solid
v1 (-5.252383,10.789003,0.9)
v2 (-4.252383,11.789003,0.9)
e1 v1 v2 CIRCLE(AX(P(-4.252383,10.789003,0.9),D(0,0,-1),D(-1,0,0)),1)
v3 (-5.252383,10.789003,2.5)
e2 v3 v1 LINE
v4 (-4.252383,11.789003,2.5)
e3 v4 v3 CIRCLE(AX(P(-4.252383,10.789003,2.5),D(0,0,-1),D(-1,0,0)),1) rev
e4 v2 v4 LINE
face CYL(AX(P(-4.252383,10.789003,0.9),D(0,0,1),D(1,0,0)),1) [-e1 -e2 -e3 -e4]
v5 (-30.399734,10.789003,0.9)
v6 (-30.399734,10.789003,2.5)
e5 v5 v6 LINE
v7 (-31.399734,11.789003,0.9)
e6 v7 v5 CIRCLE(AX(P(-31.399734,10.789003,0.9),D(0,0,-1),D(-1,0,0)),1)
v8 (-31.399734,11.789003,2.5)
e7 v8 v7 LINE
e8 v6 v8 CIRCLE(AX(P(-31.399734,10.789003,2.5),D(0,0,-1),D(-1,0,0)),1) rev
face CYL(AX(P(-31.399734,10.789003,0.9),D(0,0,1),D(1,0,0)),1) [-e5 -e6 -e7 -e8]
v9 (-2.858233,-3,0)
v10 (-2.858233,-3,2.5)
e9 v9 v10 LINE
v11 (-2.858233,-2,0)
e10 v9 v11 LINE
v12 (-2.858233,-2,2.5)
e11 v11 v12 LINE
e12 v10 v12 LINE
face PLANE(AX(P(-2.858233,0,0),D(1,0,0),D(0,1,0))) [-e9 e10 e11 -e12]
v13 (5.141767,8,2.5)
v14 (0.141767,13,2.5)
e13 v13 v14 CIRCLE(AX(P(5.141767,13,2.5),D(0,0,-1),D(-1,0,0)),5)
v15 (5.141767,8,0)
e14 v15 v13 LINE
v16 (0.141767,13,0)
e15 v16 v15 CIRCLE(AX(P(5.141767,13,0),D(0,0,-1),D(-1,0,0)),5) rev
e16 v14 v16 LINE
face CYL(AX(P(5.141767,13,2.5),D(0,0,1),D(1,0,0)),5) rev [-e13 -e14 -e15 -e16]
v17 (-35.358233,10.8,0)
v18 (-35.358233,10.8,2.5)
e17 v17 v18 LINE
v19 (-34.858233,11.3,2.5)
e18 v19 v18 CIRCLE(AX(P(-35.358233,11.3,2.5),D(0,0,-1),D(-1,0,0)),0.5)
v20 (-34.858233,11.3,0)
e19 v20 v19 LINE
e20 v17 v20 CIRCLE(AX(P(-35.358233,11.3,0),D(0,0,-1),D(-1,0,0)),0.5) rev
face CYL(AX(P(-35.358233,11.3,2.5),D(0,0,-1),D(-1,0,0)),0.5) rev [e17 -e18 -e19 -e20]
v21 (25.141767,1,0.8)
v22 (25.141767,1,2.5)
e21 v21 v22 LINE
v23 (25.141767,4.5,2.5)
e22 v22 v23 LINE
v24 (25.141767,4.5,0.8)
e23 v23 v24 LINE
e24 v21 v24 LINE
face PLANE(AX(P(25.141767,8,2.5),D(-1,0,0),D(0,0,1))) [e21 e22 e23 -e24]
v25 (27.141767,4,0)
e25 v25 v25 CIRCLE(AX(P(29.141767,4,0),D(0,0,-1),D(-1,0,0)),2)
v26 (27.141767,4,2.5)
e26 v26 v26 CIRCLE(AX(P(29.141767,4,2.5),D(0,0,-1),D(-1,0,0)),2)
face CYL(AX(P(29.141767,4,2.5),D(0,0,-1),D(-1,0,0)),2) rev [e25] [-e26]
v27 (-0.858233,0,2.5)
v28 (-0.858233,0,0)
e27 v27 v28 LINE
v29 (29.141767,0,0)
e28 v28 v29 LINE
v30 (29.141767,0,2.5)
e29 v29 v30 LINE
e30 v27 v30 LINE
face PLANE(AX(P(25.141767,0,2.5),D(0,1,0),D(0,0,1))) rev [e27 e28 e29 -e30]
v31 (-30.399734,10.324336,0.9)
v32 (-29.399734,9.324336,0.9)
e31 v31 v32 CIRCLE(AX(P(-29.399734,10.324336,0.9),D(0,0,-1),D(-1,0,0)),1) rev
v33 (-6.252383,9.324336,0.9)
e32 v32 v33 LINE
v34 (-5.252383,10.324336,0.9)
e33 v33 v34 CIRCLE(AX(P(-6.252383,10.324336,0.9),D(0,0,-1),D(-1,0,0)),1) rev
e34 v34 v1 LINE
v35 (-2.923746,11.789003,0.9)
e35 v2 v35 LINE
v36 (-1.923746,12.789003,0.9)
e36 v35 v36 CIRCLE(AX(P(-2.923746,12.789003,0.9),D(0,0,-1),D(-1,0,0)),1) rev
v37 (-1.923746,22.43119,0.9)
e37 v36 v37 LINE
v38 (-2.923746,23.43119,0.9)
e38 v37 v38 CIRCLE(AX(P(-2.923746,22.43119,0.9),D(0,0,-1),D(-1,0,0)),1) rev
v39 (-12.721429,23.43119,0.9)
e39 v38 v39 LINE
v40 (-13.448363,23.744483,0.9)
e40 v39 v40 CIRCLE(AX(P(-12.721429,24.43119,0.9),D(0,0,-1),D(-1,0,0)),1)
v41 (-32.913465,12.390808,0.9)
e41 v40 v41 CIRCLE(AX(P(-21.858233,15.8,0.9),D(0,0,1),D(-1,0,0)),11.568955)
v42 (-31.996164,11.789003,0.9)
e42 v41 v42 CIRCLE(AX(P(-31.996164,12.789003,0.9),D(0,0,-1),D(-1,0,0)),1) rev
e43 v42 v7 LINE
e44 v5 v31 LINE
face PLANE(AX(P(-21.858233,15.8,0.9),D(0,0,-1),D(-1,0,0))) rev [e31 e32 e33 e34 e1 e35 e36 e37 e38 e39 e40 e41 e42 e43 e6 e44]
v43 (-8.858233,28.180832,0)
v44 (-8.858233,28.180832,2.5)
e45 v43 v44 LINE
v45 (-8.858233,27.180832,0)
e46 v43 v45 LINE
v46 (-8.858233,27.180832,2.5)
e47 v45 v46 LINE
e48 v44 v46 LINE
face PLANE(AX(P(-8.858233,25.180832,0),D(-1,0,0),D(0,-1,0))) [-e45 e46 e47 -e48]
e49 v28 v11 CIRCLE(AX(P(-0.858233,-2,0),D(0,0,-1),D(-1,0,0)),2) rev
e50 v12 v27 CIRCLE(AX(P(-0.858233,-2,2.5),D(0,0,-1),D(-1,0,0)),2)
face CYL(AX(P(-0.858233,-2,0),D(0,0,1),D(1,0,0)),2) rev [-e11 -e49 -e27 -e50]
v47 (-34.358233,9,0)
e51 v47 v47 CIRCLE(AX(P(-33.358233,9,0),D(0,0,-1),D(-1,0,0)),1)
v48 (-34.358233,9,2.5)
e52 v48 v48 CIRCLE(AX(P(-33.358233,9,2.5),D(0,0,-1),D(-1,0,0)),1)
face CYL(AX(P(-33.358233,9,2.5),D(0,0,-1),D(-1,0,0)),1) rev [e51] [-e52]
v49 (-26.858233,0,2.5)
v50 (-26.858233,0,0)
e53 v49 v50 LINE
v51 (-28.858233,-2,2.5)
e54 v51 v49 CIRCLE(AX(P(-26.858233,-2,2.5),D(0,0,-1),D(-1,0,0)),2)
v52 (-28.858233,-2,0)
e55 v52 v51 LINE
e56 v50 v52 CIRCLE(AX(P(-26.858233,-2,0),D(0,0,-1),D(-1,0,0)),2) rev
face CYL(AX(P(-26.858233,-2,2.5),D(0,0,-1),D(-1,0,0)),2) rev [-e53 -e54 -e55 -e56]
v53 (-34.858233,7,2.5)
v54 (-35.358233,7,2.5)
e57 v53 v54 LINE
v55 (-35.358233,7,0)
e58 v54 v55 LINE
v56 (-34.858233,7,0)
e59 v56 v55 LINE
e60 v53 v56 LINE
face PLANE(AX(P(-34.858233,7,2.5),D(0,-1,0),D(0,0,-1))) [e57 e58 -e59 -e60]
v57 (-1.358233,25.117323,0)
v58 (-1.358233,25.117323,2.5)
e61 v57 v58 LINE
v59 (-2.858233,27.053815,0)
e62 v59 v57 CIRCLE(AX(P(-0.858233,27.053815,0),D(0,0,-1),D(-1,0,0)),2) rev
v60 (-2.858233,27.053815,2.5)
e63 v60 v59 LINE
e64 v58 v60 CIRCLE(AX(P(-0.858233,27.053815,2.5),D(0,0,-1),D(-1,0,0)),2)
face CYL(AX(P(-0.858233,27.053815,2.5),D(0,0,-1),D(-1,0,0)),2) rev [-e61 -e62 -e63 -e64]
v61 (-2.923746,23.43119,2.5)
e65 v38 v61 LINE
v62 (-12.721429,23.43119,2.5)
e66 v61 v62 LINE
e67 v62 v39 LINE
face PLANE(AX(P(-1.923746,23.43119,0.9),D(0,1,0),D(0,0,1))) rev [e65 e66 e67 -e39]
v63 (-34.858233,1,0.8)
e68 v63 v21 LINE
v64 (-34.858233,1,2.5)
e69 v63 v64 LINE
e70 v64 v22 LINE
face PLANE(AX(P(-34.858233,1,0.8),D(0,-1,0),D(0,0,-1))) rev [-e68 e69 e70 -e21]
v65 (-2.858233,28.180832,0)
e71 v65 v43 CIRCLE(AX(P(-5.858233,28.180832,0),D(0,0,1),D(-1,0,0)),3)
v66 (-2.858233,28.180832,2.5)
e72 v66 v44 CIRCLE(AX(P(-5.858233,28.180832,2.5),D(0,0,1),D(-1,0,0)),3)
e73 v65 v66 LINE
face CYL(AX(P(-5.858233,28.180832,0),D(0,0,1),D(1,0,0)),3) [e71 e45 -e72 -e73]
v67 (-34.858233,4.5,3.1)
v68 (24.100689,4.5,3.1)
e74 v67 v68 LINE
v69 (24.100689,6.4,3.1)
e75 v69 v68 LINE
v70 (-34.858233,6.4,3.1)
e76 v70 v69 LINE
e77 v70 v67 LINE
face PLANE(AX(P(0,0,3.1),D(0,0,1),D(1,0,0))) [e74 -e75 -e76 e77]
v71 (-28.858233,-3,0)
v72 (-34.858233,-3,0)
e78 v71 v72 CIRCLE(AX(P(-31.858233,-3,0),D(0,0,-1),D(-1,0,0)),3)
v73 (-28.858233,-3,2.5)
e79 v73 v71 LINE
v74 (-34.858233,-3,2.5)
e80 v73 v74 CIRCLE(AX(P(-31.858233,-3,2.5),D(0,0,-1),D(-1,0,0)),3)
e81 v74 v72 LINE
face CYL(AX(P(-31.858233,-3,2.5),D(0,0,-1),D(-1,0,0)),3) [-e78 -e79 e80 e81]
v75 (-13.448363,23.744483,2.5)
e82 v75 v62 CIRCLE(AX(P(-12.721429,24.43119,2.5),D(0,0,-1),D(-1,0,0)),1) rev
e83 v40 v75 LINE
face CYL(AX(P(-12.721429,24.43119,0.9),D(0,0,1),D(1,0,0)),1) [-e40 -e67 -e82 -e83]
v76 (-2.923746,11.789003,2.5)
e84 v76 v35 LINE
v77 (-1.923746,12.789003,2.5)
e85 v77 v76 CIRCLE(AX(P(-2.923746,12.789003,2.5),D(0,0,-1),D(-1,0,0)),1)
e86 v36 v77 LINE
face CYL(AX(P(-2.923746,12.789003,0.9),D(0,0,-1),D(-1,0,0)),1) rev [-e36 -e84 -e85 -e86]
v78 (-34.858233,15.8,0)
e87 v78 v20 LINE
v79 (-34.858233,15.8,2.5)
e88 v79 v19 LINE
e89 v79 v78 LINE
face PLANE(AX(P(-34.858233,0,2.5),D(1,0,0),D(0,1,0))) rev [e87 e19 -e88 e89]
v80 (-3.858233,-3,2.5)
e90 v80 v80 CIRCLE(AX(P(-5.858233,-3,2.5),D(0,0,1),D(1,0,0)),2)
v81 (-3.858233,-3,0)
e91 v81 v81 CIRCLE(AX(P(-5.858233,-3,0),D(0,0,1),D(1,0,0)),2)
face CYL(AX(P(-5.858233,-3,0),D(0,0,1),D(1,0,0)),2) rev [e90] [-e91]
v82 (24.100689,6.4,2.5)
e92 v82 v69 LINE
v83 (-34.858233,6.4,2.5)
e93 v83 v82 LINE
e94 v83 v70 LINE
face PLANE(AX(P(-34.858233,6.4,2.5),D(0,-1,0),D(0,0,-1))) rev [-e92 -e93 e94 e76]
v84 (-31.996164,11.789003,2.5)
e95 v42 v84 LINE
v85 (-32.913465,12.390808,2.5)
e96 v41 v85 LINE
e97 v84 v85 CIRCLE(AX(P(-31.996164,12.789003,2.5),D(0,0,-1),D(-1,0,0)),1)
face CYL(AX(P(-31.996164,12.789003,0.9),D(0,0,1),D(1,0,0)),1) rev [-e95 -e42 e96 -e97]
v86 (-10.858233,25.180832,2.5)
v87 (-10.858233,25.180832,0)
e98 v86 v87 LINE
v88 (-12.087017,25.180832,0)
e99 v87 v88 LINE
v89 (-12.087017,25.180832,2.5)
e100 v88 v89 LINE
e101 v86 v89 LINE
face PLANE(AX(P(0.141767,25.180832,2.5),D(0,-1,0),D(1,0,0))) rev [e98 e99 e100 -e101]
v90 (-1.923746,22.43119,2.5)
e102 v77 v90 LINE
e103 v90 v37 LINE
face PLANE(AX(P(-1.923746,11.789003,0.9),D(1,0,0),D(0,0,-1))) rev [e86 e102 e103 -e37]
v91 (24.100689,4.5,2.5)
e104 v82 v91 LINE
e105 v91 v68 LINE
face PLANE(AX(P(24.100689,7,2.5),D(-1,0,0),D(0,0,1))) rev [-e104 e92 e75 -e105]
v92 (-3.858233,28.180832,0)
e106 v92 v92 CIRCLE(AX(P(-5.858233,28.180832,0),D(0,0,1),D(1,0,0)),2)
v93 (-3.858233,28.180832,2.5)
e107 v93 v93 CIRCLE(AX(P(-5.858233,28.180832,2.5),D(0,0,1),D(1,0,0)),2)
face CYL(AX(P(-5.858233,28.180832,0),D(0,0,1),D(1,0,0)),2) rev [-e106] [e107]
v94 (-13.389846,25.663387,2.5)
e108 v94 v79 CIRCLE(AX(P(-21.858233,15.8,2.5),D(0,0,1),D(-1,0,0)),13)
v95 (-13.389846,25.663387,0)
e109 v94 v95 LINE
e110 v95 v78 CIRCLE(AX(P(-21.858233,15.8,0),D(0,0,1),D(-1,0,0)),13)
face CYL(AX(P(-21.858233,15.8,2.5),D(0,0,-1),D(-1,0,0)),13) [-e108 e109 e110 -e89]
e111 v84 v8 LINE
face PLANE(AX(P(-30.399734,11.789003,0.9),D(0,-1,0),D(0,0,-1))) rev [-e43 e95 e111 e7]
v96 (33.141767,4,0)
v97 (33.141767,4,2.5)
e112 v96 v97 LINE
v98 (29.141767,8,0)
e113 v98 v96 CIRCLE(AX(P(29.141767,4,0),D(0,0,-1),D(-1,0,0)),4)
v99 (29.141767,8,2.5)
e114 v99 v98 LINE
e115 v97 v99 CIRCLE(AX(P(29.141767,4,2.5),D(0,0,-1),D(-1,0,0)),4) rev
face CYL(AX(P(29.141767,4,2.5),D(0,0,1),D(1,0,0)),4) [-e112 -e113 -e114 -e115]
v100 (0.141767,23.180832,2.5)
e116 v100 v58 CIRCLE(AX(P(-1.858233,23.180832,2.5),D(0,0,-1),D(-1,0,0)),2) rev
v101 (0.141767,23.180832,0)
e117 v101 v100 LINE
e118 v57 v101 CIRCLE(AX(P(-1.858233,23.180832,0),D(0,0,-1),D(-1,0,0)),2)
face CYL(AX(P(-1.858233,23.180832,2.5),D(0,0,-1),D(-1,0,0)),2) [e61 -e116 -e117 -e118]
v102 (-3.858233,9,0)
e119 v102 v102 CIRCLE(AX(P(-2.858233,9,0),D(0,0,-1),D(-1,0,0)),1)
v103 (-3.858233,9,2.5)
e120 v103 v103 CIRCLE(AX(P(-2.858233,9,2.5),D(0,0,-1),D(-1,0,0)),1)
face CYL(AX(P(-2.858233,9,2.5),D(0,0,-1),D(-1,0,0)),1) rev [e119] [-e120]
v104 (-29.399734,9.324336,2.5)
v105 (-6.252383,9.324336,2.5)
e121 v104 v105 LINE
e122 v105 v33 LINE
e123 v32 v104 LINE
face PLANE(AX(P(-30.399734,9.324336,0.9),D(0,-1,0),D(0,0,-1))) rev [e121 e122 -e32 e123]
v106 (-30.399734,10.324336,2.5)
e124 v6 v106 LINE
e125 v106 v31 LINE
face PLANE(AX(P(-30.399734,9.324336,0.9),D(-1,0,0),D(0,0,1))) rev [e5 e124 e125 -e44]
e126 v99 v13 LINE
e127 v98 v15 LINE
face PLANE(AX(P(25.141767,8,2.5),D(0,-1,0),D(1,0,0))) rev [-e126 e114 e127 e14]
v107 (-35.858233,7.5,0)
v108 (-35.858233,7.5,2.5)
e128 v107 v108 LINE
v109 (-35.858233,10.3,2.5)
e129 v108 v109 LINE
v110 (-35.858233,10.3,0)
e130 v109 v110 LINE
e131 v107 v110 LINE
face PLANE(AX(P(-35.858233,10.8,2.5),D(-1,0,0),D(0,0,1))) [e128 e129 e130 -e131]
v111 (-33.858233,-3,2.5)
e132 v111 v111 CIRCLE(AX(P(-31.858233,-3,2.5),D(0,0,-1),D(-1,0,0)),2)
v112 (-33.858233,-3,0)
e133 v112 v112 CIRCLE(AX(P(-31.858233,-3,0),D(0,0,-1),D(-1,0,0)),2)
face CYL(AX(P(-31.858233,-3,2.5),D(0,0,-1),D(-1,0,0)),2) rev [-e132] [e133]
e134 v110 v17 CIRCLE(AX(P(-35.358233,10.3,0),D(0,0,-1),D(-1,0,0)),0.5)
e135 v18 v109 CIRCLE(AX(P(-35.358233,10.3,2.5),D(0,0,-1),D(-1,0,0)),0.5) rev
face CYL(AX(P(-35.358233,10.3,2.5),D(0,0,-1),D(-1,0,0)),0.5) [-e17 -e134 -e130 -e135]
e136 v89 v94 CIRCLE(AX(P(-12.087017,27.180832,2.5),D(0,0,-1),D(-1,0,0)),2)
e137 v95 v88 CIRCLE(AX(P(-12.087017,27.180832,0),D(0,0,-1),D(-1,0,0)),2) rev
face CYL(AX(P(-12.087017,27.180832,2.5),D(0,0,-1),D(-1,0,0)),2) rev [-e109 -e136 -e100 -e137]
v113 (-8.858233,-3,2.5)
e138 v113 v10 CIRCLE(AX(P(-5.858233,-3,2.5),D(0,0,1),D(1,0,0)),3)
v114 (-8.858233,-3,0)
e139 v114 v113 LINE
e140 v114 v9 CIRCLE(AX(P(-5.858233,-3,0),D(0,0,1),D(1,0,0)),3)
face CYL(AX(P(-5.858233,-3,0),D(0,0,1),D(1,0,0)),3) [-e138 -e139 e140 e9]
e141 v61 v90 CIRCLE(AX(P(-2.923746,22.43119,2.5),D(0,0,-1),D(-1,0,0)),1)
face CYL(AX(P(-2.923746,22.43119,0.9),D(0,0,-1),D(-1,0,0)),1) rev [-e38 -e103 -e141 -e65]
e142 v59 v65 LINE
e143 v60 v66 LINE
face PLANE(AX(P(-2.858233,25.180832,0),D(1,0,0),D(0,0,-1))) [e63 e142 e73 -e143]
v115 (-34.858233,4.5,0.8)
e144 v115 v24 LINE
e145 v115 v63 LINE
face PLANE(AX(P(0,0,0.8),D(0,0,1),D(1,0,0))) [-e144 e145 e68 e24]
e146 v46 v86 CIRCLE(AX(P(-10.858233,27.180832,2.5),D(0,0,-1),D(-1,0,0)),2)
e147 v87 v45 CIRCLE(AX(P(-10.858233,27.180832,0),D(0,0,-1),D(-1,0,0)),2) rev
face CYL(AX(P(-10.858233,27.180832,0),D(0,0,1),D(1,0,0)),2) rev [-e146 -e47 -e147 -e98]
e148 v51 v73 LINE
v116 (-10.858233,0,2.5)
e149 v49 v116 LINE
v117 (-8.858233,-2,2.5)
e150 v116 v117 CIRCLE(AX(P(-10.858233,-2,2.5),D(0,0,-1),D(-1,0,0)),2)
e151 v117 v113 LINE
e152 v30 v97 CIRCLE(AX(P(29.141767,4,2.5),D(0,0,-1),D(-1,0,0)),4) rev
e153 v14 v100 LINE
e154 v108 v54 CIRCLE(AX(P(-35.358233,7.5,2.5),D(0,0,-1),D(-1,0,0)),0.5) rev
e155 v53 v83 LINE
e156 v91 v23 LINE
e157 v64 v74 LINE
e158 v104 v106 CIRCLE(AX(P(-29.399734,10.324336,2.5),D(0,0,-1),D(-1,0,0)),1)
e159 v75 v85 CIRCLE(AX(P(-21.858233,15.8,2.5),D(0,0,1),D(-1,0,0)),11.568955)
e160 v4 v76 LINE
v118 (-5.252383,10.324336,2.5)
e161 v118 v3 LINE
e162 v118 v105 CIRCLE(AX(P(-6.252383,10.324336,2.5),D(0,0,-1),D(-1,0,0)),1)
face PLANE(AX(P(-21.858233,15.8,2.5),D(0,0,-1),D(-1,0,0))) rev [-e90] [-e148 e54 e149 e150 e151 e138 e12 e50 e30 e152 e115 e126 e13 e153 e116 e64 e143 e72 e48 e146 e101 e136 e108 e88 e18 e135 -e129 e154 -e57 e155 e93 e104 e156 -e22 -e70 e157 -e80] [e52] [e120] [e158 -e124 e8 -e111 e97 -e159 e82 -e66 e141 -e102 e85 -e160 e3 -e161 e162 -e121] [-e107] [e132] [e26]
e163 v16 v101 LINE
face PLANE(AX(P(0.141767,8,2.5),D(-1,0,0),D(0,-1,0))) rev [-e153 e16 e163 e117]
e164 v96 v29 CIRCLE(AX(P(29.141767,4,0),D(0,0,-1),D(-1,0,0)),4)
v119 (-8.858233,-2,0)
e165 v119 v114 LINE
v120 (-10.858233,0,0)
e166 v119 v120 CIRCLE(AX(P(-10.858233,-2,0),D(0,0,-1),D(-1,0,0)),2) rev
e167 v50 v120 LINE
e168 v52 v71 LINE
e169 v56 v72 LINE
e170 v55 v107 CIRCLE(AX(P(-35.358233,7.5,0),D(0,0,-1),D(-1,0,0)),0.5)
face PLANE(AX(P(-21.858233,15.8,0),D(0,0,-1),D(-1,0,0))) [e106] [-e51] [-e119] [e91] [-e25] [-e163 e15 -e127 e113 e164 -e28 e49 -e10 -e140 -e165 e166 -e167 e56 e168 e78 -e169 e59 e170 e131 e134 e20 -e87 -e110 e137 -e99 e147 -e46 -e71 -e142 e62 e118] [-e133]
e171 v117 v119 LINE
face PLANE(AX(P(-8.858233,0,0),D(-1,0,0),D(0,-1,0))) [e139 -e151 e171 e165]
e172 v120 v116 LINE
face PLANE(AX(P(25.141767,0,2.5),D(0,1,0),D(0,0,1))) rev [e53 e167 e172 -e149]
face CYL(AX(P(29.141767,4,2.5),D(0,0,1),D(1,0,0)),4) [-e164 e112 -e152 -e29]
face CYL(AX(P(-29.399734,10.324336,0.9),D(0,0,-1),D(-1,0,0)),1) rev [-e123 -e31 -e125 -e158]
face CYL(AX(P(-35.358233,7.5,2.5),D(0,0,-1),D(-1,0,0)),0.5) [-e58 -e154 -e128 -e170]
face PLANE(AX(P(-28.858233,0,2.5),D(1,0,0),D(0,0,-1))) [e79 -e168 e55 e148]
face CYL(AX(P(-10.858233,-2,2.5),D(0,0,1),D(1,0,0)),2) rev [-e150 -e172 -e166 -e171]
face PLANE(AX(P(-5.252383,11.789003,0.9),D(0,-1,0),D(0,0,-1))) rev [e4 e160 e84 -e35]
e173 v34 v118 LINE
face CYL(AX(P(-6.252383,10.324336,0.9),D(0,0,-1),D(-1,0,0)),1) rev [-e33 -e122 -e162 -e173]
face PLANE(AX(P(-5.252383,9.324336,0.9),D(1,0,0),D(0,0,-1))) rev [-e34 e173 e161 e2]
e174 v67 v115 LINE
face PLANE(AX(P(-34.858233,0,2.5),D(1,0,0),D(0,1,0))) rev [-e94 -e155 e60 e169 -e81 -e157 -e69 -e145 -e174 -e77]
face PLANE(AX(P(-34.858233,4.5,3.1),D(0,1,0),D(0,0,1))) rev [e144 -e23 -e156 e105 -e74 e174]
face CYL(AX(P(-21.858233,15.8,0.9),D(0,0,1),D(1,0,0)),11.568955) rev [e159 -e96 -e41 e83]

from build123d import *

# Parameters (mm, degrees)
AUFSATZ_LINEAR_AUSTRAGEN1_DEPTH = 2.5
VERRUNDUNG1_R                   = 2
VERRUNDUNG2_R                   = 5
SKIZZE2_W                       = 60
SKIZZE2_H                       = 6
SCHNITT_LINEAR_AUSTRAGEN1_DEPTH = 1.7
SKIZZE3_W                       = 60
SKIZZE3_H                       = 2.5
AUFSATZ_LINEAR_AUSTRAGEN3_DEPTH = 2.3
SKIZZE5_R                       = 1
SCHNITT_LINEAR_AUSTRAGEN3_DEPTH = 2.5
SKIZZE6_R                       = 1
SCHNITT_LINEAR_AUSTRAGEN4_DEPTH = 2.5
SKIZZE7_W                       = 8
SKIZZE7_H                       = 8
SKIZZE7_R                       = 2
AUFSATZ_LINEAR_AUSTRAGEN4_DEPTH = 2.5
VERRUNDUNG3_R                   = 4
SKIZZE8_W                       = 1.041077985
SKIZZE8_H                       = 2.5
SCHNITT_LINEAR_AUSTRAGEN5_DEPTH = 0.6
SKIZZE10_W                      = 58.958922015
SKIZZE10_H                      = 0.6
SCHNITT_LINEAR_AUSTRAGEN6_DEPTH = 0.6
SCHNITT_LINEAR_AUSTRAGEN7_DEPTH = 1.6
SKIZZESTUTZENINNEN_R            = 2
AUFSATZ_LINEAR_AUSTRAGEN5_DEPTH = 2.5
VERRUNDUNG4_R                   = 1
VERRUNDUNG5_R                   = 2
VERRUNDUNG6_R                   = 2
SKIZZE12_R                      = 2
AUFSATZ_LINEAR_AUSTRAGEN6_DEPTH = 2.5
VERRUNDUNG7_R                   = 2
SKIZZE13_W                      = 1
SKIZZE13_H                      = 3.8
AUFSATZ_LINEAR_AUSTRAGEN7_DEPTH = 2.5
VERRUNDUNG9_R                   = 0.5


# Some blends are built 0.0001 mm under size
with BuildPart() as part:
    # d-body → Aufsatz-Linear austragen1 (new body)
    with BuildSketch(Plane.XY):
        with BuildLine():
            Line((25.141766665, 0), (-34.858233335, 0))
            Line((-34.858233335, 0), (-34.858233335, 15.8))
            ThreePointArc((-34.858233335, 15.8), (-31.050621491, 24.992388155), (-21.858233335, 28.8))
            ThreePointArc((-21.858233335, 28.8), (-17.008017348, 27.861318538), (-12.858233335, 25.18083152))
            Line((-12.858233335, 25.18083152), (0.141766665, 25.18083152))
            Line((0.141766665, 25.18083152), (0.141766665, 8))
            Line((0.141766665, 8), (25.141766665, 8))
            Line((25.141766665, 8), (25.141766665, 0))
        make_face()
    extrude(amount=AUFSATZ_LINEAR_AUSTRAGEN1_DEPTH)

    # Verrundung1
    verrundung1_edges = [part.edges().sort_by_distance(p)[0] for p in [
        (0.141766665, 25.18083152, 1.25),
    ]]
    fillet(verrundung1_edges, radius=VERRUNDUNG1_R)

    # Verrundung2
    verrundung2_edges = [part.edges().sort_by_distance(p)[0] for p in [
        (0.141766665, 8, 1.25),
    ]]
    fillet(verrundung2_edges, radius=VERRUNDUNG2_R)

    # Skizze2 → Schnitt-Linear austragen1 (cut)
    with BuildSketch(Plane.XY.offset(2.5)):
        with Locations((-4.858233335, 4)):
            Rectangle(SKIZZE2_W, SKIZZE2_H)
    extrude(amount=-SCHNITT_LINEAR_AUSTRAGEN1_DEPTH, mode=Mode.SUBTRACT)

    # Skizze3 → Aufsatz-Linear austragen3 (add)
    with BuildSketch(Plane.XY.offset(0.8)):
        with Locations((-4.858233335, 5.75)):
            Rectangle(SKIZZE3_W, SKIZZE3_H)
    extrude(amount=AUFSATZ_LINEAR_AUSTRAGEN3_DEPTH)

    # Skizze5 → Schnitt-Linear austragen3 (cut)
    with BuildSketch(Plane(origin=(0, 0, 0), x_dir=(-1, 0, 0), z_dir=(0, 0, -1))):
        with Locations((33.358233335, 9)):
            Circle(SKIZZE5_R)
    extrude(amount=-SCHNITT_LINEAR_AUSTRAGEN3_DEPTH, mode=Mode.SUBTRACT)

    # Skizze6 → Schnitt-Linear austragen4 (cut)
    with BuildSketch(Plane(origin=(0, 0, 0), x_dir=(-1, 0, 0), z_dir=(0, 0, -1))):
        with Locations((2.858233335, 9)):
            Circle(SKIZZE6_R)
    extrude(amount=-SCHNITT_LINEAR_AUSTRAGEN4_DEPTH, mode=Mode.SUBTRACT)

    # Skizze7 → Aufsatz-Linear austragen4 (add)
    with BuildSketch(Plane(origin=(0, 0, 0), x_dir=(-1, 0, 0), z_dir=(0, 0, -1))):
        with Locations((-29.141766665, 4)):
            Rectangle(SKIZZE7_W, SKIZZE7_H)
        with Locations((-29.141766665, 4)):
            Circle(SKIZZE7_R, mode=Mode.SUBTRACT)
    extrude(amount=-AUFSATZ_LINEAR_AUSTRAGEN4_DEPTH)

    # Verrundung3
    verrundung3_edges = [part.edges().sort_by_distance(p)[0] for p in [
        (33.141766665, 0, 1.25),
        (33.141766665, 8, 1.25),
    ]]
    fillet(verrundung3_edges, radius=VERRUNDUNG3_R - 0.0001)  # a hair under: the kernel refuses the full size

    # Skizze8 → Schnitt-Linear austragen5 (cut)
    with BuildSketch(Plane.XY.offset(3.1)):
        with Locations((24.621227673, 5.75)):
            Rectangle(SKIZZE8_W, SKIZZE8_H)
    extrude(amount=-SCHNITT_LINEAR_AUSTRAGEN5_DEPTH, mode=Mode.SUBTRACT)

    # Skizze10 → Schnitt-Linear austragen6 (cut)
    with BuildSketch(Plane.XY.offset(3.1)):
        with Locations((-5.378772328, 6.7)):
            Rectangle(SKIZZE10_W, SKIZZE10_H)
    extrude(amount=-SCHNITT_LINEAR_AUSTRAGEN6_DEPTH, mode=Mode.SUBTRACT)

    # Skizze11 → Schnitt-Linear austragen7 (cut)
    with BuildSketch(Plane.XY.offset(2.5)):
        with BuildLine():
            Line((-30.399734465, 9.324335962), (-5.252382746, 9.324335962))
            Line((-5.252382746, 9.324335962), (-5.252382746, 11.789002727))
            Line((-5.252382746, 11.789002727), (-1.923745725, 11.789002727))
            Line((-1.923745725, 11.789002727), (-1.923745725, 23.431190429))
            Line((-1.923745725, 23.431190429), (-13.163081736, 23.431190429))
            ThreePointArc((-13.163081736, 23.431190429), (-27.503142881, 25.898303071), (-32.913464689, 12.390808249))
            Line((-32.913464689, 12.390808249), (-32.913464689, 11.789002727))
            Line((-32.913464689, 11.789002727), (-30.399734465, 11.789002727))
            Line((-30.399734465, 11.789002727), (-30.399734465, 9.324335962))
        make_face()
    extrude(amount=-SCHNITT_LINEAR_AUSTRAGEN7_DEPTH, mode=Mode.SUBTRACT)

    # SkizzeStutzenInnen → Aufsatz-Linear austragen5 (add)
    # profile 1 of 2: a face of its own
    with BuildSketch(Plane.XY.offset(2.5)):
        with BuildLine():
            Line((-8.858233335, 25.18083152), (-8.858233335, 28.18083152))
            ThreePointArc((-8.858233335, 28.18083152), (-5.858233335, 31.18083152), (-2.858233335, 28.18083152))
            Line((-2.858233335, 28.18083152), (-2.858233335, 25.18083152))
            Line((-2.858233335, 25.18083152), (-8.858233335, 25.18083152))
        make_face()
        with Locations((-5.858233335, 28.18083152)):
            Circle(SKIZZESTUTZENINNEN_R, mode=Mode.SUBTRACT)
    # profile 2 of 2: a face of its own
    with BuildSketch(Plane.XY.offset(2.5)):
        with BuildLine():
            Line((-8.858233335, 0), (-8.858233335, -3))
            ThreePointArc((-8.858233335, -3), (-5.858233335, -6), (-2.858233335, -3))
            Line((-2.858233335, -3), (-2.858233335, 0))
            Line((-2.858233335, 0), (-8.858233335, 0))
        make_face()
        with Locations((-5.858233335, -3)):
            Circle(SKIZZESTUTZENINNEN_R, mode=Mode.SUBTRACT)
    extrude(amount=-AUFSATZ_LINEAR_AUSTRAGEN5_DEPTH)

    # Verrundung4
    # the kernel refuses this fillet: 1 mm, written as the material it adds along each edge
    with BuildSketch(Plane(origin=(-1.923745725, 23.431190429, 2.5), x_dir=(-1, 0, 0), z_dir=(0, 0, -1)), Plane(origin=(-1.923745725, 11.789002727, 2.5), x_dir=(0, 1, 0), z_dir=(0, 0, -1)), Plane(origin=(-5.252382746, 9.324335962, 2.5), x_dir=(0, 1, 0), z_dir=(0, 0, -1))) as verrundung4_piece_1:
        with BuildLine():
            CenterArc((VERRUNDUNG4_R, -VERRUNDUNG4_R), VERRUNDUNG4_R, 90, 90)
            Line((0, -VERRUNDUNG4_R), (0, 0))
            Line((0, 0), (VERRUNDUNG4_R, 0))
        make_face()
    extrude(amount=1.6)
    with BuildSketch(Plane(origin=(-32.913464689, 11.789002727, 2.5), x_dir=(1, 0, 0), z_dir=(0, 0, -1))) as verrundung4_piece_2:
        with BuildLine():
            CenterArc((0.917301018, -1), VERRUNDUNG4_R, 90, 66.534645017)
            Line((0, -0.601805522), (0, 0))
            Line((0, 0), (0.917301018, 0))
        make_face()
    extrude(amount=1.6)
    with BuildSketch(Plane(origin=(-30.399734465, 9.324335962, 2.5), x_dir=(0, 1, 0), z_dir=(0, 0, -1))) as verrundung4_piece_3:
        with BuildLine():
            CenterArc((VERRUNDUNG4_R, VERRUNDUNG4_R), VERRUNDUNG4_R, 180, 90)
            Line((0, VERRUNDUNG4_R), (0, 0))
            Line((0, 0), (VERRUNDUNG4_R, 0))
        make_face()
    extrude(amount=1.6)
    # the kernel refuses this fillet: 1 mm, written as the material it takes off along each edge
    with BuildSketch(Plane(origin=(-13.163081736, 23.431190429, 3.604131537), x_dir=(1, 0, 0), z_dir=(0, 0, -1))) as verrundung4_2_piece_1:
        with BuildLine():
            CenterArc((0.441652615, -1), VERRUNDUNG4_R, 90, 46.62999375)
            ThreePointArc((-0.28528164, -0.313292938), (-0.141206384, -0.157952653), (0, 0))
            Line((0, 0), (0.441652615, 0))
        make_face()
    extrude(amount=2.704131537, mode=Mode.SUBTRACT)
    with BuildSketch(Plane(origin=(-30.399734465, 11.789002727, 5), x_dir=(0, -1, 0), z_dir=(0, 0, -1))) as verrundung4_2_piece_2:
        with BuildLine():
            CenterArc((VERRUNDUNG4_R, VERRUNDUNG4_R), VERRUNDUNG4_R, 180, 90)
            Line((0, VERRUNDUNG4_R), (0, 0))
            Line((0, 0), (VERRUNDUNG4_R, 0))
        make_face()
    extrude(amount=4.1, mode=Mode.SUBTRACT)
    with BuildSketch(Plane(origin=(-5.252382746, 11.789002727, 5), x_dir=(0, -1, 0), z_dir=(0, 0, -1))) as verrundung4_2_piece_3:
        with BuildLine():
            CenterArc((VERRUNDUNG4_R, -VERRUNDUNG4_R), VERRUNDUNG4_R, 90, 90)
            Line((0, -VERRUNDUNG4_R), (0, 0))
            Line((0, 0), (VERRUNDUNG4_R, 0))
        make_face()
    extrude(amount=4.1, mode=Mode.SUBTRACT)

    # Verrundung5
    verrundung5_edges = [part.edges().sort_by_distance(p)[0] for p in [
        (-8.858233335, 0, 1.25),
        (-2.858233335, 0, 1.25),
        (-2.858233335, 25.18083152, 1.25),
        (-8.858233335, 25.18083152, 1.25),
    ]]
    fillet(verrundung5_edges, radius=VERRUNDUNG5_R)

    # Verrundung6
    verrundung6_edges = [part.edges().sort_by_distance(p)[0] for p in [
        (-12.858233335, 25.18083152, 1.25),
    ]]
    fillet(verrundung6_edges, radius=VERRUNDUNG6_R)

    # Skizze12 → Aufsatz-Linear austragen6 (add)
    with BuildSketch(Plane(origin=(0, 0, 0), x_dir=(-1, 0, 0), z_dir=(0, 0, -1))):
        with BuildLine():
            Line((28.858233335, 0), (34.858233335, 0))
            Line((34.858233335, 0), (34.858233335, -3))
            ThreePointArc((34.858233335, -3), (31.858233335, -6), (28.858233335, -3))
            Line((28.858233335, -3), (28.858233335, 0))
        make_face()
        with Locations((31.858233335, -3)):
            Circle(SKIZZE12_R, mode=Mode.SUBTRACT)
    extrude(amount=-AUFSATZ_LINEAR_AUSTRAGEN6_DEPTH)

    # Verrundung7
    verrundung7_edges = [part.edges().sort_by_distance(p)[0] for p in [
        (-28.858233335, 0, 1.25),
    ]]
    fillet(verrundung7_edges, radius=VERRUNDUNG7_R)

    # Skizze13 → Aufsatz-Linear austragen7 (add)
    with BuildSketch(Plane(origin=(0, 0, 0), x_dir=(-1, 0, 0), z_dir=(0, 0, -1))):
        with Locations((35.358233335, 8.9)):
            Rectangle(SKIZZE13_W, SKIZZE13_H)
    extrude(amount=-AUFSATZ_LINEAR_AUSTRAGEN7_DEPTH)

    # Verrundung9
    verrundung9_edges = [part.edges().sort_by_distance(p)[0] for p in [
        (-34.858233335, 10.8, 1.25),
        (-35.858233335, 7, 1.25),
        (-35.858233335, 10.8, 1.25),
    ]]
    fillet(verrundung9_edges, radius=VERRUNDUNG9_R - 0.0001)  # a hair under: the kernel refuses the full size


solid = part.part
